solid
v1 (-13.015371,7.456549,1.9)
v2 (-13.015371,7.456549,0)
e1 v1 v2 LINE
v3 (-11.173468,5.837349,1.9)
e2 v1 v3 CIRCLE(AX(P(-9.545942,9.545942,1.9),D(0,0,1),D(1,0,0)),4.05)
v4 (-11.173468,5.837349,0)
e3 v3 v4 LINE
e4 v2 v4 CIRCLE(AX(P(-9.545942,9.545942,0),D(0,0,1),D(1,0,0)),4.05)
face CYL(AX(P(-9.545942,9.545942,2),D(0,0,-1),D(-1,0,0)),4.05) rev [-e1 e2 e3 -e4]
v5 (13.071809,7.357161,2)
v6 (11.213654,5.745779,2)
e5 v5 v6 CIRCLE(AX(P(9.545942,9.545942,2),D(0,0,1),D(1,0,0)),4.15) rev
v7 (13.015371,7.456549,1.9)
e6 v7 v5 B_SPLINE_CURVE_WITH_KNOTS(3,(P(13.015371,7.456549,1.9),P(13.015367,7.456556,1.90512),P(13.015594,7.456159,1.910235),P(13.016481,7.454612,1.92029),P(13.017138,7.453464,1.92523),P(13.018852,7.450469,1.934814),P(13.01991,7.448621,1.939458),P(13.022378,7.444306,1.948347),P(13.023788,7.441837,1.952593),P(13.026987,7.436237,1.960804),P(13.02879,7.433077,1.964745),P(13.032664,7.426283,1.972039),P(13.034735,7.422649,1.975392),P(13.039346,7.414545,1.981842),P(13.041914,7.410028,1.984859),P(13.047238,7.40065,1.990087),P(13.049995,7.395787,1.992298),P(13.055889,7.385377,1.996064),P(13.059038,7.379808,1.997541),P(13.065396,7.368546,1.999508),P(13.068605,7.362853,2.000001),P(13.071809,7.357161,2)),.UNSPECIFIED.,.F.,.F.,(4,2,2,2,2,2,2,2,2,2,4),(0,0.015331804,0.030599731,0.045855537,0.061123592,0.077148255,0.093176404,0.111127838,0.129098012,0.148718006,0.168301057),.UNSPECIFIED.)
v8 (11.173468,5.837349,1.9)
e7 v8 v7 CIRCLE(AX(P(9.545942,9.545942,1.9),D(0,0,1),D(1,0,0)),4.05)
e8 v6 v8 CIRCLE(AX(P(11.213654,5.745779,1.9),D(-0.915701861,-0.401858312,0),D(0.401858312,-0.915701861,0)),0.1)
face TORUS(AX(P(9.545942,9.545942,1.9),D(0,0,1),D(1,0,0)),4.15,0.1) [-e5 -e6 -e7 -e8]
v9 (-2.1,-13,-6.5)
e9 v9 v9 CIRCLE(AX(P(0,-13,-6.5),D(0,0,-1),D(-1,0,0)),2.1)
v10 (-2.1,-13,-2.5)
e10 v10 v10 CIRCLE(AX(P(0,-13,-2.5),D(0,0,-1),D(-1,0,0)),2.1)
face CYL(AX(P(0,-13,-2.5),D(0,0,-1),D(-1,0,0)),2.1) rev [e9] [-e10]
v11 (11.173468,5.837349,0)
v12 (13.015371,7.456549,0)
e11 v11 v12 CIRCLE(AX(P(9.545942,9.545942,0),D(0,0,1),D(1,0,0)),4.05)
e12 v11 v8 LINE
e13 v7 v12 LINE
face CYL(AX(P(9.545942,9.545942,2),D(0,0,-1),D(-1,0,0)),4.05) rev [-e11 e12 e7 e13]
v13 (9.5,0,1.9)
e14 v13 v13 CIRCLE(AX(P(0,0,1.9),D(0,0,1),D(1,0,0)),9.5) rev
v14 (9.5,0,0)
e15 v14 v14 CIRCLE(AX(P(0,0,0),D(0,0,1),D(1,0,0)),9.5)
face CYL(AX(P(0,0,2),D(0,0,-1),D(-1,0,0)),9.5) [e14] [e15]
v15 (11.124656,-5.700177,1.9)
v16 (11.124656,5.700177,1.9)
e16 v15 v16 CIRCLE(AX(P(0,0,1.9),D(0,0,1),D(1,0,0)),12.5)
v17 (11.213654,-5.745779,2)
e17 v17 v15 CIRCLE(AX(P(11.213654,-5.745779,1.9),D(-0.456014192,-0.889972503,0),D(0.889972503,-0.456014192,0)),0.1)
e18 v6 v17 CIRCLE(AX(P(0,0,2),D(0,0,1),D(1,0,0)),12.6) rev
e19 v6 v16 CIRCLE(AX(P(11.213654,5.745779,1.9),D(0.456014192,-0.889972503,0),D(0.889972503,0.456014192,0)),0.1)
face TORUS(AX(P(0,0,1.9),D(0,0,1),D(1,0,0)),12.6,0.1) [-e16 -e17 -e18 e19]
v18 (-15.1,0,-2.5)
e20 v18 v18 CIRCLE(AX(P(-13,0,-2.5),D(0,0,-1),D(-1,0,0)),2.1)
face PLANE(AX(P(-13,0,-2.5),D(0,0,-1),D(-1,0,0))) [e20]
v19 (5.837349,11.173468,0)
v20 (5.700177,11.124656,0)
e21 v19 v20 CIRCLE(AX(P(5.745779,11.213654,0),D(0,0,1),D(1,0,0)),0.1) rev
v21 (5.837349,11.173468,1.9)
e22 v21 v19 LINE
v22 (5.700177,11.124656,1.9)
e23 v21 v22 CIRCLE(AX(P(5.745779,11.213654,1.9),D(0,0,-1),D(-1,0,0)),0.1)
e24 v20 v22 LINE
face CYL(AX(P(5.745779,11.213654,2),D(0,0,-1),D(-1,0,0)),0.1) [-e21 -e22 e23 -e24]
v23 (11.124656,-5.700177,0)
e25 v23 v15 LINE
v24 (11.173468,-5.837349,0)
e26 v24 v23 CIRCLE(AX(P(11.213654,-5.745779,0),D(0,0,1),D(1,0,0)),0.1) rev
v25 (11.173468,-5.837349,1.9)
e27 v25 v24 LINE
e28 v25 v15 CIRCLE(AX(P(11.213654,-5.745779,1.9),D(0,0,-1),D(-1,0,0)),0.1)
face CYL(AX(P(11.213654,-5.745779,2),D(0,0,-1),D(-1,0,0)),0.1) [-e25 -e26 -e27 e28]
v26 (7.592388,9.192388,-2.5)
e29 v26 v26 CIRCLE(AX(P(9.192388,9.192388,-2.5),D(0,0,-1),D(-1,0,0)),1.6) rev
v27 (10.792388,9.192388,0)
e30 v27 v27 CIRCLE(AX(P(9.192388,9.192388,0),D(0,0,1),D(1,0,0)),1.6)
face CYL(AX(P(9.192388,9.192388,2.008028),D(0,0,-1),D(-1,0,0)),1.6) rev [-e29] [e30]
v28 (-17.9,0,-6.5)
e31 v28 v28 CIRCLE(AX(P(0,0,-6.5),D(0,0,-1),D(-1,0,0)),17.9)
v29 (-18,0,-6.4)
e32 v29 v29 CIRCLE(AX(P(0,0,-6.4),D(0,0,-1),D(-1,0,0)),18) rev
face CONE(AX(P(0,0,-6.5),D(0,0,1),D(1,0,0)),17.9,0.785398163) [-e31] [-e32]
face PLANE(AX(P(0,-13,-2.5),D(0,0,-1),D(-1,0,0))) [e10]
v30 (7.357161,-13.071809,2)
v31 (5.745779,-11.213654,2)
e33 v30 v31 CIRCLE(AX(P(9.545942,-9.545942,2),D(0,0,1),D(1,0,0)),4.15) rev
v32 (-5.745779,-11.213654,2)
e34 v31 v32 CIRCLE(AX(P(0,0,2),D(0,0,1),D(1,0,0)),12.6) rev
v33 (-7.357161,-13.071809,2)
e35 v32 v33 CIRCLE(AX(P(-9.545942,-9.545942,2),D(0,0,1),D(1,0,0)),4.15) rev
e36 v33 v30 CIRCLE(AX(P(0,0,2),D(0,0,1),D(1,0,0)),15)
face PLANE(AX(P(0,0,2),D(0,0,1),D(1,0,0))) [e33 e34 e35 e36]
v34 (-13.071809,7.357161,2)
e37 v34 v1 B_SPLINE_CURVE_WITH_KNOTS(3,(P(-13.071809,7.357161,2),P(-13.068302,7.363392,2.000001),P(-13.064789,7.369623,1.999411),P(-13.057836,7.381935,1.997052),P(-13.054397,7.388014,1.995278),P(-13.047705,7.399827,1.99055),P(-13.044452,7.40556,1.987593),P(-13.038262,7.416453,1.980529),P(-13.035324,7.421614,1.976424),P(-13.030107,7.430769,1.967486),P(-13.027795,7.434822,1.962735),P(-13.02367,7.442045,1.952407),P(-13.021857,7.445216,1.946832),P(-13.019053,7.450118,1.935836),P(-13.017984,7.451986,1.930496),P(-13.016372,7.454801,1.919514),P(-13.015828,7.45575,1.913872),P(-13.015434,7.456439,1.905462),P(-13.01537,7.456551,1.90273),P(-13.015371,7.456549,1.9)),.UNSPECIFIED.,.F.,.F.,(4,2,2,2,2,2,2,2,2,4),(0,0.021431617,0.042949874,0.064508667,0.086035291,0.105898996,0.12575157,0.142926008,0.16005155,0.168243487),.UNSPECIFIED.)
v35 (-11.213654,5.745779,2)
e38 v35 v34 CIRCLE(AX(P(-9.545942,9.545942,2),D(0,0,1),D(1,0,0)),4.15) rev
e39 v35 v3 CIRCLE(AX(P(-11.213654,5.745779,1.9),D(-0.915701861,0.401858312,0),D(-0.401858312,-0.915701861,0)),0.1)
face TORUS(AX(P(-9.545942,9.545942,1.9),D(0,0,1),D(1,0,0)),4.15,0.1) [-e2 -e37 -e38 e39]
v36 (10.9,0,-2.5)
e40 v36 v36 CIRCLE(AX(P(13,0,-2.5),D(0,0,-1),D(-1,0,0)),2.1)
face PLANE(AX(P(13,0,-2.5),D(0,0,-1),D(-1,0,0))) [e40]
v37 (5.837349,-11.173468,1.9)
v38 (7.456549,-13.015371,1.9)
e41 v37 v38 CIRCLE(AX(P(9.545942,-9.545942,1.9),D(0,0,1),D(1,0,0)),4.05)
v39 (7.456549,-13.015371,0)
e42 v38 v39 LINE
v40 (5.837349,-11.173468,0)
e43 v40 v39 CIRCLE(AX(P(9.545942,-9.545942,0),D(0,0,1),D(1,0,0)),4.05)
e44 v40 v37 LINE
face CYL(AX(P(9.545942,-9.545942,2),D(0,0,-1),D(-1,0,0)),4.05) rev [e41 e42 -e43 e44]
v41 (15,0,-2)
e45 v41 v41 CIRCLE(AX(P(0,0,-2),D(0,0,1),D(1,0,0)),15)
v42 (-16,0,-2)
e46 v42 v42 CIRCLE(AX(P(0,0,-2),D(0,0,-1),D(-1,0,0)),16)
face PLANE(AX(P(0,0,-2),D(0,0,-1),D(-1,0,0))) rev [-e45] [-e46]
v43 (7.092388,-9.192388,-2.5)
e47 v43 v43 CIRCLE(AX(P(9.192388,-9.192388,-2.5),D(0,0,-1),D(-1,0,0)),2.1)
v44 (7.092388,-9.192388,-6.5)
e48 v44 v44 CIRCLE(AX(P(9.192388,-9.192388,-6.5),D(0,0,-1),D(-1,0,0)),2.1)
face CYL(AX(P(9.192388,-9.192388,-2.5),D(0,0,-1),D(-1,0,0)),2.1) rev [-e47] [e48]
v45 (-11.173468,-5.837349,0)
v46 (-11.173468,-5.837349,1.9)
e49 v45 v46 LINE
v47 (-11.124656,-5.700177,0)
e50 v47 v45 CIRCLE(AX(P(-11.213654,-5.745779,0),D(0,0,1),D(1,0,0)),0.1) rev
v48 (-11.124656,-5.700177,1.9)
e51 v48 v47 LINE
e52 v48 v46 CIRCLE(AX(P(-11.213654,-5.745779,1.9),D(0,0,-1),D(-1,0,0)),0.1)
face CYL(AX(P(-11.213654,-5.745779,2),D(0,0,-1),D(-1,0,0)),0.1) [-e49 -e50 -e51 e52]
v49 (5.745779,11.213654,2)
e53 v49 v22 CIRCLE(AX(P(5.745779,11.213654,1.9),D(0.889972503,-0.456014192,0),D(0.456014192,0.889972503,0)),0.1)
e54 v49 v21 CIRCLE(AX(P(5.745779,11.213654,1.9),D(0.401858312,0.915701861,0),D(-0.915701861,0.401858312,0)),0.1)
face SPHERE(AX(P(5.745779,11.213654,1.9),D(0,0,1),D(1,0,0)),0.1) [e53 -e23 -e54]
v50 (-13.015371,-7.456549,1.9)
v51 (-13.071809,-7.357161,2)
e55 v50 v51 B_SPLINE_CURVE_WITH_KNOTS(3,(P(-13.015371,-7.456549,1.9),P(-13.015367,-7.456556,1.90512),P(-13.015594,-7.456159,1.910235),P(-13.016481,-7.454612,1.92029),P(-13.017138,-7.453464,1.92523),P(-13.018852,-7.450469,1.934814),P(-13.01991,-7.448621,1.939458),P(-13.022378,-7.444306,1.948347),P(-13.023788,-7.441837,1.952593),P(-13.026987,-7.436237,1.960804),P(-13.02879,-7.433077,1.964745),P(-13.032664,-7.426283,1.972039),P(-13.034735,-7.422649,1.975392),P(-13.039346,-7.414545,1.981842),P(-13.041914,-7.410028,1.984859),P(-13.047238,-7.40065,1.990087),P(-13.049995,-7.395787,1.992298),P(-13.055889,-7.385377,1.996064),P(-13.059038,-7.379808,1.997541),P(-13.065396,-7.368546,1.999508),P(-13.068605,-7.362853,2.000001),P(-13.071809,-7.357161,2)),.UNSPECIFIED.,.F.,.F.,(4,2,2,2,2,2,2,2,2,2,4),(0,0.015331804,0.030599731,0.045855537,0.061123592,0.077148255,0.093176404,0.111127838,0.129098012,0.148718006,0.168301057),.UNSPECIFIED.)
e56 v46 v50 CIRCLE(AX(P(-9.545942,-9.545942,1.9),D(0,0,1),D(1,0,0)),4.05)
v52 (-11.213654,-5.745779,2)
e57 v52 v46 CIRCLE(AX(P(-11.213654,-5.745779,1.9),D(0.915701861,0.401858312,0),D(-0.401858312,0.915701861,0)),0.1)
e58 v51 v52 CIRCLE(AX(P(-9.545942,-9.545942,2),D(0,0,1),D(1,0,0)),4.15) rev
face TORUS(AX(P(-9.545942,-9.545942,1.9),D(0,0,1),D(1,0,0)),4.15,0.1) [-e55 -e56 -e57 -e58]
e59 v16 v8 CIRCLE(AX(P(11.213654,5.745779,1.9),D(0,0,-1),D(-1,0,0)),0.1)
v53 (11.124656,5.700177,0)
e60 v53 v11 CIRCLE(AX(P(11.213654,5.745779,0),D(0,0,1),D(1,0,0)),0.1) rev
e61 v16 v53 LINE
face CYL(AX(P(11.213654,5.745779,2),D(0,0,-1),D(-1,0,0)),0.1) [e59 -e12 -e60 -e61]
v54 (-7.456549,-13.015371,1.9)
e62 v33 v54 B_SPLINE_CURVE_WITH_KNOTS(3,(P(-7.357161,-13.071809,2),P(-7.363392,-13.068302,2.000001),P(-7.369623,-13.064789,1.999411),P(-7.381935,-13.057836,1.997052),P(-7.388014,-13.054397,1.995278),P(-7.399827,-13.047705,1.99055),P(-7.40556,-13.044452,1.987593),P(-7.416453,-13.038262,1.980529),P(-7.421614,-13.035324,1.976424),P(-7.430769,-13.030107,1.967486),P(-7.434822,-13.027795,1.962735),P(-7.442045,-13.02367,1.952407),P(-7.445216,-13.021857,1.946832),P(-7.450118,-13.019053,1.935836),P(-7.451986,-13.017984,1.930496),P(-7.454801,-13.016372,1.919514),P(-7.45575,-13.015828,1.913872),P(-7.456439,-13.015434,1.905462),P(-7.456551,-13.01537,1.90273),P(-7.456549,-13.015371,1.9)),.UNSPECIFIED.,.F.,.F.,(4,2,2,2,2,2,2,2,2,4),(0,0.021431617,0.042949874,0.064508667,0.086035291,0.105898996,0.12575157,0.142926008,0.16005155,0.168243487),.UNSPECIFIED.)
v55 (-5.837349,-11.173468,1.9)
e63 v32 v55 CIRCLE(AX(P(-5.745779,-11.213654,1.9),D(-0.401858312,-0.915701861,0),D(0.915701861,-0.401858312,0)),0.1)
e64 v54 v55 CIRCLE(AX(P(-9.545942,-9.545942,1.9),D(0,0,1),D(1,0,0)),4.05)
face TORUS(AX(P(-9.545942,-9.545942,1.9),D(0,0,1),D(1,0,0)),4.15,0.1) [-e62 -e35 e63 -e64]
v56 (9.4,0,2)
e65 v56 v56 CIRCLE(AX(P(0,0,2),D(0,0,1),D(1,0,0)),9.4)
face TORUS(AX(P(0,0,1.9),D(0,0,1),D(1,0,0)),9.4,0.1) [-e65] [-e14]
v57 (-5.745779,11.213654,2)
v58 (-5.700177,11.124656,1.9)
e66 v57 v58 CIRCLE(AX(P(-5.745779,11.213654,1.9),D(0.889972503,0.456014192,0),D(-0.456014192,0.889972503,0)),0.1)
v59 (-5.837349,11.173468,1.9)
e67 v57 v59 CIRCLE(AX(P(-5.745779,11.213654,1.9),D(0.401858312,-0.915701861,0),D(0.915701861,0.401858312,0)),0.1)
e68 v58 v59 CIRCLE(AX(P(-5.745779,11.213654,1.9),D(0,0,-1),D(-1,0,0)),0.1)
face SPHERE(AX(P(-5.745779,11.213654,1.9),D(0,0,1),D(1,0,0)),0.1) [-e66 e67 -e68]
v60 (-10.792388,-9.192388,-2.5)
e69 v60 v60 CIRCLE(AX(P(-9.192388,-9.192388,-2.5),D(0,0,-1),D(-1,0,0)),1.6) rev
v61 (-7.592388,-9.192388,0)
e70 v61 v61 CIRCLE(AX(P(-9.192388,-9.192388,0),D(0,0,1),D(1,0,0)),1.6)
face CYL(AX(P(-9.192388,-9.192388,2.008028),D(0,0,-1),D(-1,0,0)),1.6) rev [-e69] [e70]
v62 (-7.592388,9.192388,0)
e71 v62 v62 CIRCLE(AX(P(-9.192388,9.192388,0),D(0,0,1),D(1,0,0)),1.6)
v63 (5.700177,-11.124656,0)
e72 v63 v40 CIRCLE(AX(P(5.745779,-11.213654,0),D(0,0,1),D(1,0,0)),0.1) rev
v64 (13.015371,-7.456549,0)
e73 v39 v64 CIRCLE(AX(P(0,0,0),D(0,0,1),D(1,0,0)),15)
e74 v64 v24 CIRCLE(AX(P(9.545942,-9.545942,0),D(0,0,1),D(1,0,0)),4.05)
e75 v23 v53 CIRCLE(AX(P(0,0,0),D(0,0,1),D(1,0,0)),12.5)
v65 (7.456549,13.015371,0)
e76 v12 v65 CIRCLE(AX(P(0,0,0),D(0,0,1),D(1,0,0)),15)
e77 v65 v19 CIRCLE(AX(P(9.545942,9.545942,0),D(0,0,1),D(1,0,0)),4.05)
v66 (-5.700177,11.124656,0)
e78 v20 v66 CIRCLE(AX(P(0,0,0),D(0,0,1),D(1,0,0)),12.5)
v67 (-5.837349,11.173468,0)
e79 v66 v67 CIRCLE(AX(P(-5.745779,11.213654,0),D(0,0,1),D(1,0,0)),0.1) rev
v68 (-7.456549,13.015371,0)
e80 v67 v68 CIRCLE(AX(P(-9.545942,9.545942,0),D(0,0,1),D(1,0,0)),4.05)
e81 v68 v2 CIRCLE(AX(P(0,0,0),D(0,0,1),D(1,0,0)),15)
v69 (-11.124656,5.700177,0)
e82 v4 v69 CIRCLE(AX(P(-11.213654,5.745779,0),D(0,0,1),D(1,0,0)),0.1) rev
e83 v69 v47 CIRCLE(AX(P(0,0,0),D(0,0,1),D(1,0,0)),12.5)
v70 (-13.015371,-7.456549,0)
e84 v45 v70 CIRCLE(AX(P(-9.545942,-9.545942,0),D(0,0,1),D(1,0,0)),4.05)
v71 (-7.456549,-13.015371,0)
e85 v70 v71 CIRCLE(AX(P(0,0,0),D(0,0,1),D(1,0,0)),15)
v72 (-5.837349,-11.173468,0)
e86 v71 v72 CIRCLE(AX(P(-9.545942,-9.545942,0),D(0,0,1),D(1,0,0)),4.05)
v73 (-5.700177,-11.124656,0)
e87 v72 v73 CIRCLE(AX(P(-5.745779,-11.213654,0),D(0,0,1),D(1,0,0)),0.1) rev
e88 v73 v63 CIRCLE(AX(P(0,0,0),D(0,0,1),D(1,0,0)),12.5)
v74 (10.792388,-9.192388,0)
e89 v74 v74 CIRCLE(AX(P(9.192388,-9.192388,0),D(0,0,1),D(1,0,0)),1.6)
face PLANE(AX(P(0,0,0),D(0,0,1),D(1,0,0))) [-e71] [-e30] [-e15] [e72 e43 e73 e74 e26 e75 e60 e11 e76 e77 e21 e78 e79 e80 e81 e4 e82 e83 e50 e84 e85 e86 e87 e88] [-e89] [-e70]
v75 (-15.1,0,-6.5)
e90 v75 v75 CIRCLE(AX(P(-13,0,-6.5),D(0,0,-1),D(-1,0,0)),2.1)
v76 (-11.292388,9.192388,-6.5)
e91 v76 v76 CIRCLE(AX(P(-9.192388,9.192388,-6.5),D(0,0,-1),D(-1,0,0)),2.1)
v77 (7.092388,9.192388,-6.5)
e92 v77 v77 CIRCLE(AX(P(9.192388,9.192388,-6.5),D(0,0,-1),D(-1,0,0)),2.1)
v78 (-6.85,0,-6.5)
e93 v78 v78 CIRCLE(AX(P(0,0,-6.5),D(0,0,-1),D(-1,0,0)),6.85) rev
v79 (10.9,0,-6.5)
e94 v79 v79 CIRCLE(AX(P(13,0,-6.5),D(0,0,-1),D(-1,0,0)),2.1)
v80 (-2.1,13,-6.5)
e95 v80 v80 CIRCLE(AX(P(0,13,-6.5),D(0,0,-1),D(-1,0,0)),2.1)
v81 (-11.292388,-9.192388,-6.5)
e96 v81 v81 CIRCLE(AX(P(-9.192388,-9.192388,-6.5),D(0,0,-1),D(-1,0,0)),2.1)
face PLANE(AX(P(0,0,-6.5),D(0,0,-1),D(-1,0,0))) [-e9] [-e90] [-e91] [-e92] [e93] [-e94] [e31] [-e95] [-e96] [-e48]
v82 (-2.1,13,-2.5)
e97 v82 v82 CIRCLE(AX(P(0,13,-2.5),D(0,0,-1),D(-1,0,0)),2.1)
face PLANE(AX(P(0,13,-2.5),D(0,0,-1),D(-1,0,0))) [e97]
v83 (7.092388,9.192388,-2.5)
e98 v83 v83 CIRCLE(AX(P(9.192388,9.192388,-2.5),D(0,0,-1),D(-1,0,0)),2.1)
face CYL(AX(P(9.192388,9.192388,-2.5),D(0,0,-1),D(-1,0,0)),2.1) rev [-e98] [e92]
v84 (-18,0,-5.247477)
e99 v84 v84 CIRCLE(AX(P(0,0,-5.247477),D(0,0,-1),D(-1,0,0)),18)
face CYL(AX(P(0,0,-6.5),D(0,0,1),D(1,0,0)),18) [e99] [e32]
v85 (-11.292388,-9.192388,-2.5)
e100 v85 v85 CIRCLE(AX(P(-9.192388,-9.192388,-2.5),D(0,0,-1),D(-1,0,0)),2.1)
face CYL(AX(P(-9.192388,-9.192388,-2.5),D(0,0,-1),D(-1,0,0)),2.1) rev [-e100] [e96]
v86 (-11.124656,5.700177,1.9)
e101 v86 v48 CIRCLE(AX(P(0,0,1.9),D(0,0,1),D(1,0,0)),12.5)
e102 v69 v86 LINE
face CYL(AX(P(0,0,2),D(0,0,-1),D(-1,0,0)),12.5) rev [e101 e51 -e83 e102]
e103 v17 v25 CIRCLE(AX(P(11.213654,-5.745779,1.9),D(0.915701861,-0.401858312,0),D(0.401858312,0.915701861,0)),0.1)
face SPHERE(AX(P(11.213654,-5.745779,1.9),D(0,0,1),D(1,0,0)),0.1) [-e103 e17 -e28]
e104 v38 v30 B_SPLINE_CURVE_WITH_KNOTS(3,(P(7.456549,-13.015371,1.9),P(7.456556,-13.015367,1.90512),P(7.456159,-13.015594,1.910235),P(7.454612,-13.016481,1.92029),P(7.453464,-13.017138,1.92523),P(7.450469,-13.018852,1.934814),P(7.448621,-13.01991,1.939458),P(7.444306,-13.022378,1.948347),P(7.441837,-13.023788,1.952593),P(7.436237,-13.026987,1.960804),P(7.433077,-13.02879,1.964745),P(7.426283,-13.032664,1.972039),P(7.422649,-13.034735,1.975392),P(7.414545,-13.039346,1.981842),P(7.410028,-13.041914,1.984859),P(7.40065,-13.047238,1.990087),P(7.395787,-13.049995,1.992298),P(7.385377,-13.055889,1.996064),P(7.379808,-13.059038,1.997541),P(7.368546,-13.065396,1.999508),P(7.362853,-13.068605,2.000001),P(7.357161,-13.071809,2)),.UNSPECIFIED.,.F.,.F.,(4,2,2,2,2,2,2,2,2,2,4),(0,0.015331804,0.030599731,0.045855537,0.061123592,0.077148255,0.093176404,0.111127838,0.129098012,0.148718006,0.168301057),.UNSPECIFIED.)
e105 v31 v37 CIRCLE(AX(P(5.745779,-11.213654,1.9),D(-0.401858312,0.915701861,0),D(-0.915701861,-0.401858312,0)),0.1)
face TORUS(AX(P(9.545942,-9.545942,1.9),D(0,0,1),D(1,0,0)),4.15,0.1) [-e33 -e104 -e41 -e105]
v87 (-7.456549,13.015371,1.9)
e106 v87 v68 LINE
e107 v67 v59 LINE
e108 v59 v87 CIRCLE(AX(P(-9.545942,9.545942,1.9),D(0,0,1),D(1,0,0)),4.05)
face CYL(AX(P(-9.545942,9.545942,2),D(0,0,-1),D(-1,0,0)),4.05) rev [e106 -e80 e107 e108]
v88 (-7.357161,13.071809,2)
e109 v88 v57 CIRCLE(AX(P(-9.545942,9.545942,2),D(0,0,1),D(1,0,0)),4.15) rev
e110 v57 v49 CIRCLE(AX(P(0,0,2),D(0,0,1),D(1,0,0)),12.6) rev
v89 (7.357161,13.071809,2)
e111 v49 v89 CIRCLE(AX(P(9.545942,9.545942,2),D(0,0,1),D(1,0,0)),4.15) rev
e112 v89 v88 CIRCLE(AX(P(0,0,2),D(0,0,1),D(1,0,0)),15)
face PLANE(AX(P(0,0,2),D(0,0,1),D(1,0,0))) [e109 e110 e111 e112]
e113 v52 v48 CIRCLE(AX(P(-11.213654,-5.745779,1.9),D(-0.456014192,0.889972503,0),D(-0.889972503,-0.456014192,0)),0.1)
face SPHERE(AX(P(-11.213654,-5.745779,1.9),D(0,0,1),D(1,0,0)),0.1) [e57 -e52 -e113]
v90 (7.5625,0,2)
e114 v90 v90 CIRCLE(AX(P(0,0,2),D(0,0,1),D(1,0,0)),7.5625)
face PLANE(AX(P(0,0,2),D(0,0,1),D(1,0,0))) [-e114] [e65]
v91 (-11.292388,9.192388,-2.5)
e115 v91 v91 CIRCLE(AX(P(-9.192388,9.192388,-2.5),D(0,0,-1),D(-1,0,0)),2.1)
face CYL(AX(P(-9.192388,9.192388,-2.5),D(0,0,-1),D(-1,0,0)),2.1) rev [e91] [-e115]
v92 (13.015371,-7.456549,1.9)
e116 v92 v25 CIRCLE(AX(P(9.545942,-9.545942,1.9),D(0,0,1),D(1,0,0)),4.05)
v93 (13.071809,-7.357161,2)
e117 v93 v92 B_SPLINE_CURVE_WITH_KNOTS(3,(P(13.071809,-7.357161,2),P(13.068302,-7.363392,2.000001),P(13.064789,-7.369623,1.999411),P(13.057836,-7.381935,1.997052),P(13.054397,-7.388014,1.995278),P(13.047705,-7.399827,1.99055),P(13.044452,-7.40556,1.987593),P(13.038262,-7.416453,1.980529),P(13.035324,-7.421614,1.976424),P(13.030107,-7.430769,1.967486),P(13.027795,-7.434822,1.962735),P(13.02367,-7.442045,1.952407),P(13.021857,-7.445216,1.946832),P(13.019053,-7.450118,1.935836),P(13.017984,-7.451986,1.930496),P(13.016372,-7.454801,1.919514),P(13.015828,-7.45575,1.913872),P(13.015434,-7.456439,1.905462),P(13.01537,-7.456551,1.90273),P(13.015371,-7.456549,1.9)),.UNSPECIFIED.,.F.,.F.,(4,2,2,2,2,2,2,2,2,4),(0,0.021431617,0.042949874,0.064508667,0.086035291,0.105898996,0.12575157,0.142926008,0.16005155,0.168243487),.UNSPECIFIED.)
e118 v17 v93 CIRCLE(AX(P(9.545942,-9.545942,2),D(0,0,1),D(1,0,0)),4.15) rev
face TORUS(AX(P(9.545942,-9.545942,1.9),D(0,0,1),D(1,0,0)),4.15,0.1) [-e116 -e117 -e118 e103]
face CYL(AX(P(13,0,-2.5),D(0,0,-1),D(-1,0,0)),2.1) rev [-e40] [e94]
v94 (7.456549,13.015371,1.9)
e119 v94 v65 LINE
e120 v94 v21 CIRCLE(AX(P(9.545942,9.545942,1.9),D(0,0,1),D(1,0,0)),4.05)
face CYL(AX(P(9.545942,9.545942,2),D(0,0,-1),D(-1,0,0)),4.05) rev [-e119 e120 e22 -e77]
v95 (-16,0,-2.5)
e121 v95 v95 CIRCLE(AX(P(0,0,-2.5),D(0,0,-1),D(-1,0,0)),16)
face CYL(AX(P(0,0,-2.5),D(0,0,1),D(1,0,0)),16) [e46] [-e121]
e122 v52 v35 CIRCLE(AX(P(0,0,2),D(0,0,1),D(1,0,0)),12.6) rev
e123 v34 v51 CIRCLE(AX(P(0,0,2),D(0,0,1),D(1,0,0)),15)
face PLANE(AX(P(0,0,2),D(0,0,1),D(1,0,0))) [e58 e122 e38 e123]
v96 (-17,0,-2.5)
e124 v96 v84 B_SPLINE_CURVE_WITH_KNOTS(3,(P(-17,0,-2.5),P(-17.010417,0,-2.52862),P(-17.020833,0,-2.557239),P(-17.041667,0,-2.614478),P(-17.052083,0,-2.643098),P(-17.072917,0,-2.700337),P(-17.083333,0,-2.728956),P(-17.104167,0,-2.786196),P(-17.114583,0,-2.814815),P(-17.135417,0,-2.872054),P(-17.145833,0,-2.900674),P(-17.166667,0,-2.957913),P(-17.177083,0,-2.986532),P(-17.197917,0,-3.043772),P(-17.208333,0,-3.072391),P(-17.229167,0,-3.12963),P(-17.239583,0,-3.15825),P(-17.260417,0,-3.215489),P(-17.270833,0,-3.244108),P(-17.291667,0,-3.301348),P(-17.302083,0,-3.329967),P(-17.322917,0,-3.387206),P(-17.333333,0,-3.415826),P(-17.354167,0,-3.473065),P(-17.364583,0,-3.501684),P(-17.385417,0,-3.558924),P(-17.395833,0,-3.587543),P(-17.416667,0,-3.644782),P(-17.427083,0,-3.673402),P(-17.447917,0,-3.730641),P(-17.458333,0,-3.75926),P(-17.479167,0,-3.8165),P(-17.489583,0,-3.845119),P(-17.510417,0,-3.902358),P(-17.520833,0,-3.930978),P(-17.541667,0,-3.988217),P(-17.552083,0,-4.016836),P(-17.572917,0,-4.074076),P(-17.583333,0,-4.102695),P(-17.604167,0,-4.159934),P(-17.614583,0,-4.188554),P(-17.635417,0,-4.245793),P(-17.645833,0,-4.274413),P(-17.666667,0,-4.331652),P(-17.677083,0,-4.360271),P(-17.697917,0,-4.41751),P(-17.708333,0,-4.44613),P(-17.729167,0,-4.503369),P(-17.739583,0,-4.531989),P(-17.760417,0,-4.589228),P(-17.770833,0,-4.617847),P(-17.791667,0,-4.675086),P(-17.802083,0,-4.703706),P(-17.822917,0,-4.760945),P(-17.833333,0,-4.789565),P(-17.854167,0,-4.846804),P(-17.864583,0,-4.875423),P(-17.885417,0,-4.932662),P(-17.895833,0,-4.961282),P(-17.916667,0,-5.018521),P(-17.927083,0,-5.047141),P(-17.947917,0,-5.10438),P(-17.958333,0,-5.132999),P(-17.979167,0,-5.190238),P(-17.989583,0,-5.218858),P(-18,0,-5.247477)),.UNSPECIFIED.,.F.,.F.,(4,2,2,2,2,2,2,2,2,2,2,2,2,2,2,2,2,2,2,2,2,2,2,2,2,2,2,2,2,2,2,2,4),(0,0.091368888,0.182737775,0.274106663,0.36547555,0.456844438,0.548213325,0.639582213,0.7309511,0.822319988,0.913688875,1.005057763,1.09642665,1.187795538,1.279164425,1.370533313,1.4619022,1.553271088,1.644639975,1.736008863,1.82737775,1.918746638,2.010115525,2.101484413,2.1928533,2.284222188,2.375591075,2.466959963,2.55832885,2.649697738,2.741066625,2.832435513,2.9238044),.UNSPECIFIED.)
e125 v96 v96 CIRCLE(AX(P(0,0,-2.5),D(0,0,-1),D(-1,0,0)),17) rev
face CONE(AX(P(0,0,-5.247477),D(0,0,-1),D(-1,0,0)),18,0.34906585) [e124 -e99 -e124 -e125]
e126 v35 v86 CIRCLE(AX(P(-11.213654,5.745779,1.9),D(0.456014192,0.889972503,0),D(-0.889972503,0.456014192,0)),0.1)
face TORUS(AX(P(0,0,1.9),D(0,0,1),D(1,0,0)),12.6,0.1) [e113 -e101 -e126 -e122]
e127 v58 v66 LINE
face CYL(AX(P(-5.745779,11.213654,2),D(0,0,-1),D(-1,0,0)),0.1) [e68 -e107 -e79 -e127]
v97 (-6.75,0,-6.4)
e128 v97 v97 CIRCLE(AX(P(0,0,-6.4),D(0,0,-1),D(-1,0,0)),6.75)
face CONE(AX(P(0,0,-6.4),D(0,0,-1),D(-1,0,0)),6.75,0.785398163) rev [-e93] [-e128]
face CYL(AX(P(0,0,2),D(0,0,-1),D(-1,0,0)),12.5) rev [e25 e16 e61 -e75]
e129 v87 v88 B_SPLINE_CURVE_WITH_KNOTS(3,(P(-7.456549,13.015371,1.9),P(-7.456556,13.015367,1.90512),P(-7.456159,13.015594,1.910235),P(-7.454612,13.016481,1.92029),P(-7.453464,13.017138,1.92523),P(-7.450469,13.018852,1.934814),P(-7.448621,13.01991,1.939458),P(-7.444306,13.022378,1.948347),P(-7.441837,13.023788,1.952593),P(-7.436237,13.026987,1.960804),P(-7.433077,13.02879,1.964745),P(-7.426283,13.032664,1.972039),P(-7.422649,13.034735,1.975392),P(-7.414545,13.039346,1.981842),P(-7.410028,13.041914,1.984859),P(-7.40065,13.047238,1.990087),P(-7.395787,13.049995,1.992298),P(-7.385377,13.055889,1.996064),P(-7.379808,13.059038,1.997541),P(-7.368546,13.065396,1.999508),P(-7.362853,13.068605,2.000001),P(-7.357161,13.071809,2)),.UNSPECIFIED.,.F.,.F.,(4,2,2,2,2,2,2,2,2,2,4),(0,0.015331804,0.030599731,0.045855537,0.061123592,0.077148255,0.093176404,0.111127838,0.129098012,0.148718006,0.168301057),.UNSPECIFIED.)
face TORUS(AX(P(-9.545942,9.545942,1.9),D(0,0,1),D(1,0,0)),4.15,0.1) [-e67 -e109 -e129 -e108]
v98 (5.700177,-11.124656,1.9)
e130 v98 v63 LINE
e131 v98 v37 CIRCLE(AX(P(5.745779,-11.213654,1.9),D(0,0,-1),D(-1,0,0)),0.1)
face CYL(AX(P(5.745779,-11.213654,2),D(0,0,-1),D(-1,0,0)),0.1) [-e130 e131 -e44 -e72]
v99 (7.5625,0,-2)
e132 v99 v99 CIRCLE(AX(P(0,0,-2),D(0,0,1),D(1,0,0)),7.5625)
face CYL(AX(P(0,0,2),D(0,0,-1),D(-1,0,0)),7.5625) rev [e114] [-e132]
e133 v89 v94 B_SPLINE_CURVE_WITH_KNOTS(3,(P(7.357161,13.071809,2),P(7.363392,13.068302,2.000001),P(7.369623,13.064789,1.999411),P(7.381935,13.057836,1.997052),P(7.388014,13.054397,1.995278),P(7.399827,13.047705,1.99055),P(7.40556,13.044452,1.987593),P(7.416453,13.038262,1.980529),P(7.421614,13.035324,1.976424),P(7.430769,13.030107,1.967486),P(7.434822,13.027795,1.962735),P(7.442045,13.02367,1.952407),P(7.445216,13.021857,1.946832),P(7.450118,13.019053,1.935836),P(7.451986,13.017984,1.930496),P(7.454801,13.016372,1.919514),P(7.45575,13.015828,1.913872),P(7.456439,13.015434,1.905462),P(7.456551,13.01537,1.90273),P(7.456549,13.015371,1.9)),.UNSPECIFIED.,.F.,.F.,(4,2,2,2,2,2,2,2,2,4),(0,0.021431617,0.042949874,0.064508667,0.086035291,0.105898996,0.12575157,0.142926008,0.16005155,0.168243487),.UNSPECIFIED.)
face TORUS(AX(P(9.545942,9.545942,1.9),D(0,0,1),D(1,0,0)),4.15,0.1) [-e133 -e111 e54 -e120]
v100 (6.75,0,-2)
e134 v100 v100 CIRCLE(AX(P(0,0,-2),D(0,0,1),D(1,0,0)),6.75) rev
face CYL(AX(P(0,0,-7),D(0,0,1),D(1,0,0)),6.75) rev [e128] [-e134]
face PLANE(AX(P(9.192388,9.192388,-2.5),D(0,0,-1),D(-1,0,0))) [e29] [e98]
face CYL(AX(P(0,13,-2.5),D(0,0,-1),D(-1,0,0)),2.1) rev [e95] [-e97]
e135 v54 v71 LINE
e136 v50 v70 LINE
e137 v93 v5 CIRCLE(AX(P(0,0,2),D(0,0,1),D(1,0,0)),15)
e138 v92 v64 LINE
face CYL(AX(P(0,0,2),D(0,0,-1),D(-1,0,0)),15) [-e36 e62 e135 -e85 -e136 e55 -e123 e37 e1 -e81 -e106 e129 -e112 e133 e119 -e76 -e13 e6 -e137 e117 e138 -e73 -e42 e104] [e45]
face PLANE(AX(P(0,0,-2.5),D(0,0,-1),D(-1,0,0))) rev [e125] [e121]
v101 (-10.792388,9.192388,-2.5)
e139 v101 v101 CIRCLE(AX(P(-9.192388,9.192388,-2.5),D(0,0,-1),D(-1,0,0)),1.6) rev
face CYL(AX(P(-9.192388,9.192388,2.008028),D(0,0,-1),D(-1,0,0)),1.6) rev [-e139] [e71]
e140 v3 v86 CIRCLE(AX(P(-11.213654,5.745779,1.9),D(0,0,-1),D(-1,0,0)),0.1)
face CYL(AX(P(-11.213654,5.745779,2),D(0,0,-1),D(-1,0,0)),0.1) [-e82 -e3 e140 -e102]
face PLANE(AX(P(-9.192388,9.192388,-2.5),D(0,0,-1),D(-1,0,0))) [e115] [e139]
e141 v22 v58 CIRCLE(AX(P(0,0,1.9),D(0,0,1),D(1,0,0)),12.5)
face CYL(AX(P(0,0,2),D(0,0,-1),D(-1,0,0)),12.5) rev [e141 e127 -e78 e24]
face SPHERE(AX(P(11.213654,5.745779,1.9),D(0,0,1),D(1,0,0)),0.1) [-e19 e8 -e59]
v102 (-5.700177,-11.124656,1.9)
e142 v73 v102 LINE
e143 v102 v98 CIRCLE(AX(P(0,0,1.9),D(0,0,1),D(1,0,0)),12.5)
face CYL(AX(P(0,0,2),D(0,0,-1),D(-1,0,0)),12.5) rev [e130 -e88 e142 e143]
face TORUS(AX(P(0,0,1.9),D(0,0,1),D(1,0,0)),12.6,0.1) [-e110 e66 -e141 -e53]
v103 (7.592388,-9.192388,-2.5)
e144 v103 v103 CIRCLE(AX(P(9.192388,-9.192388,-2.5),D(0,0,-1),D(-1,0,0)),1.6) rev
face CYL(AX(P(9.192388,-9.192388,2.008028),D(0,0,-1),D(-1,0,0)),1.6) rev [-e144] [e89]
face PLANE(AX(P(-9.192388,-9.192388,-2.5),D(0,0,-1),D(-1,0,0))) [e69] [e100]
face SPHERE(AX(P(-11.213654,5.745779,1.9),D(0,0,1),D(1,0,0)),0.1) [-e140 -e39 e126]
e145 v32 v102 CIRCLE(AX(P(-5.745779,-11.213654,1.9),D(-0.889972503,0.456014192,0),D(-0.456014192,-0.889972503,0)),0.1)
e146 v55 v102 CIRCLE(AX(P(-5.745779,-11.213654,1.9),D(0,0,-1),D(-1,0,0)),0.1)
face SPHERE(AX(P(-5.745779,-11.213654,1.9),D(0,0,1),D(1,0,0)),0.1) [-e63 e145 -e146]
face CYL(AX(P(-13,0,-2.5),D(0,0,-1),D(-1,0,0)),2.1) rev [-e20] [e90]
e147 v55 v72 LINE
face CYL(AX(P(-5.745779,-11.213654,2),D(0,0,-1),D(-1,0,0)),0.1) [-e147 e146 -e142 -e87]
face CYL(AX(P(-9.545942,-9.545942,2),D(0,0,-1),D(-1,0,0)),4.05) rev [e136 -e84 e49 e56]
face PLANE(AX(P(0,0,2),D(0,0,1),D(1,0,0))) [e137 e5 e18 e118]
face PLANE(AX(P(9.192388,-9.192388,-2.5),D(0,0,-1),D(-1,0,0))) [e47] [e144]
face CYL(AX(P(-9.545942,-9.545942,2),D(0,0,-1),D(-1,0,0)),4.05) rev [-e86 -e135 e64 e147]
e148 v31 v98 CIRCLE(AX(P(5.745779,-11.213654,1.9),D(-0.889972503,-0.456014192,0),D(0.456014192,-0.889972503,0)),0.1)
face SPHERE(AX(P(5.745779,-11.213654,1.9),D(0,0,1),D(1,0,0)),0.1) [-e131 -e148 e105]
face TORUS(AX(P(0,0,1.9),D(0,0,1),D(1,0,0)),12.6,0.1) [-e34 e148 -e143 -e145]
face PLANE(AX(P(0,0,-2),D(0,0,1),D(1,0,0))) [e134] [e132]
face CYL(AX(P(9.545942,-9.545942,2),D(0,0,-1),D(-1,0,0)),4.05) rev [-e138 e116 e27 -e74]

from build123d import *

# Parameters (mm, degrees)
BOSS_EXTRUDE1_DEPTH     = 2
BOSS_EXTRUDE1_2_DEPTH   = 2
BOSS_EXTRUDE1_3_DEPTH   = 2
BOSS_EXTRUDE1_4_DEPTH   = 2
SKETCH1_R               = 9.5
SKETCH1_R_2             = 7.5625
BOSS_EXTRUDE1_5_DEPTH   = 2
BOSS_EXTRUDE2_START     = -2
SKETCH2_R               = 15
BOSS_EXTRUDE2_DEPTH     = 2
FILLET1_R               = 0.1
FILLET2_R               = 0.1
SKETCH4_R               = 16
BOSS_EXTRUDE3_DEPTH     = 0.5
SKETCH5_R               = 18
BOSS_EXTRUDE4_DEPTH     = 4
CUT_EXTRUDE2_DEPTH      = 26.850531909
CUT_EXTRUDE2_DEPTH_BACK = 26.850531909
SKETCH3_R               = 1.6
SKETCH6_R               = 2.1
CUT_EXTRUDE3_DEPTH      = 4
SKETCH7_R               = 2.1
CUT_EXTRUDE4_DEPTH      = 4
SKETCH8_R               = 6.75
MIDDLE_CUTOUT_DEPTH     = 7
CHAMFER1_SIZE           = 0.1
CUT_EXTRUDE6_START      = -2
SKETCH9_R               = 7.5625
CUT_EXTRUDE6_DEPTH      = 2
CHAMFER2_SIZE           = 1
CHAMFER2_SIZE2          = 2.747477419


with BuildPart() as part:
    # Sketch1 → Boss-Extrude1 (new body)
    with BuildSketch(Plane.XY):
        with BuildLine():
            ThreePointArc((5.795745748, 11.075167323), (6.469207051, 12.179609111), (7.456549067, 13.01537076))
            ThreePointArc((7.456549067, 13.01537076), (0, 15), (-7.456549067, 13.01537076))
            ThreePointArc((-7.456549067, 13.01537076), (-6.469207051, 12.179609111), (-5.795745748, 11.075167323))
            ThreePointArc((-5.795745748, 11.075167323), (0, 12.5), (5.795745748, 11.075167323))
        make_face()
    extrude(amount=BOSS_EXTRUDE1_DEPTH)



with BuildPart() as body_2:
    # Sketch1 → Boss-Extrude1 2 (new body)
    with BuildSketch(Plane.XY):
        with BuildLine():
            ThreePointArc((13.01537076, -7.456549067), (14.495353762, -3.858071967), (15, 0))
            ThreePointArc((15, 0), (14.495353762, 3.858071967), (13.01537076, 7.456549067))
            ThreePointArc((13.01537076, 7.456549067), (12.179609111, 6.469207051), (11.075167323, 5.795745748))
            ThreePointArc((11.075167323, 5.795745748), (12.5, 0), (11.075167323, -5.795745748))
            ThreePointArc((11.075167323, -5.795745748), (12.179609111, -6.469207051), (13.01537076, -7.456549067))
        make_face()
    extrude(amount=BOSS_EXTRUDE1_2_DEPTH)


with BuildPart() as body_3:
    # Sketch1 → Boss-Extrude1 3 (new body)
    with BuildSketch(Plane.XY):
        with BuildLine():
            ThreePointArc((-7.456549067, -13.01537076), (0, -15), (7.456549067, -13.01537076))
            ThreePointArc((7.456549067, -13.01537076), (6.469207051, -12.179609111), (5.795745748, -11.075167323))
            ThreePointArc((5.795745748, -11.075167323), (0, -12.5), (-5.795745748, -11.075167323))
            ThreePointArc((-5.795745748, -11.075167323), (-6.469207051, -12.179609111), (-7.456549067, -13.01537076))
        make_face()
    extrude(amount=BOSS_EXTRUDE1_3_DEPTH)


with BuildPart() as body_4:
    # Sketch1 → Boss-Extrude1 4 (new body)
    with BuildSketch(Plane.XY):
        with BuildLine():
            ThreePointArc((-11.075167323, 5.795745748), (-12.179609111, 6.469207051), (-13.01537076, 7.456549067))
            ThreePointArc((-13.01537076, 7.456549067), (-15, 0), (-13.01537076, -7.456549067))
            ThreePointArc((-13.01537076, -7.456549067), (-12.179609111, -6.469207051), (-11.075167323, -5.795745748))
            ThreePointArc((-11.075167323, -5.795745748), (-12.5, 0), (-11.075167323, 5.795745748))
        make_face()
    extrude(amount=BOSS_EXTRUDE1_4_DEPTH)


with BuildPart() as body_5:
    # Sketch1 → Boss-Extrude1 5 (new body)
    with BuildSketch(Plane.XY):
        Circle(SKETCH1_R)
        Circle(SKETCH1_R_2, mode=Mode.SUBTRACT)
    extrude(amount=BOSS_EXTRUDE1_5_DEPTH)


with BuildPart() as part_1:
    add(part.part)

    add(body_2.part)  # Boss-Extrude2 merges body 2

    add(body_3.part)  # Boss-Extrude2 merges body 3

    add(body_4.part)  # Boss-Extrude2 merges body 4

    add(body_5.part)  # Boss-Extrude2 merges body 5
    # Sketch2 → Boss-Extrude2 (add)
    with BuildSketch(Plane.XY.offset(BOSS_EXTRUDE2_START)):
        with Locations(Location((0, 0, 0), (0, 0, 150.191461703))):
            Circle(SKETCH2_R)
    extrude(amount=BOSS_EXTRUDE2_DEPTH)

    # Fillet1
    fillet1_edges = [part_1.edges().sort_by_distance(p)[0] for p in [
        (11.075167323, 5.795745748, 1),
        (11.075167323, -5.795745748, 1),
        (5.795745748, -11.075167323, 1),
        (-5.795745748, -11.075167323, 1),
        (-11.075167323, -5.795745748, 1),
        (-11.075167323, 5.795745748, 1),
        (5.795745748, 11.075167323, 1),
        (-5.795745748, 11.075167323, 1),
    ]]
    fillet(fillet1_edges, radius=FILLET1_R)

    # Fillet2
    fillet2_edges = [part_1.edges().sort_by_distance(p)[0] for p in [
        (6.504180663, 12.219925602, 2),
        (12.219925602, -6.504180663, 2),
        (-6.504180663, -12.219925602, 2),
        (-12.219925602, 6.504180663, 2),
        (-9.5, 0, 2),
        (0, -12.5, 2),
        (6.504180663, -12.219925602, 2),
        (5.779303749, -11.119440592, 2),
        (-5.779303749, -11.119440592, 2),
        (12.5, 0, 2),
        (12.219925602, 6.504180663, 2),
        (11.119440592, 5.779303749, 2),
        (11.119440592, -5.779303749, 2),
        (0, 12.5, 2),
        (-6.504180663, 12.219925602, 2),
        (-5.779303749, 11.119440592, 2),
        (5.779303749, 11.119440592, 2),
        (-12.5, 0, 2),
        (-12.219925602, -6.504180663, 2),
        (-11.119440592, -5.779303749, 2),
        (-11.119440592, 5.779303749, 2),
    ]]
    fillet(fillet2_edges, radius=FILLET2_R - 0.0001)  # a hair under: the kernel refuses the full size

    # Sketch4 → Boss-Extrude3 (add)
    with BuildSketch(Plane(origin=(0, 0, -2), x_dir=(-1, 0, 0), z_dir=(0, 0, -1))):
        Circle(SKETCH4_R)
    extrude(amount=BOSS_EXTRUDE3_DEPTH)

    # Sketch5 → Boss-Extrude4 (add)
    with BuildSketch(Plane(origin=(0, 0, -2.5), x_dir=(-1, 0, 0), z_dir=(0, 0, -1))):
        Circle(SKETCH5_R)
    extrude(amount=BOSS_EXTRUDE4_DEPTH)

    # Sketch3 → Cut-Extrude2 (cut, two sides: drawn at the far end of the back side and taken through both)
    with BuildSketch(Plane(origin=(0, 0, -2), x_dir=(-1, 0, 0), z_dir=(0, 0, -1)).offset(-CUT_EXTRUDE2_DEPTH_BACK)):
        with Locations((-9.192388155, 9.192388155)):
            Circle(SKETCH3_R)
        with Locations((9.192388155, 9.192388155)):
            Circle(SKETCH3_R)
        with Locations((9.192388155, -9.192388155)):
            Circle(SKETCH3_R)
        with Locations((-9.192388155, -9.192388155)):
            Circle(SKETCH3_R)
    extrude(amount=CUT_EXTRUDE2_DEPTH + CUT_EXTRUDE2_DEPTH_BACK, mode=Mode.SUBTRACT)

    # Sketch6 → Cut-Extrude3 (cut)
    with BuildSketch(Plane(origin=(0, 0, -6.5), x_dir=(-1, 0, 0), z_dir=(0, 0, -1))):
        with Locations((-9.192388155, 9.192388155)):
            Circle(SKETCH6_R)
        with Locations((9.192388155, 9.192388155)):
            Circle(SKETCH6_R)
        with Locations((9.192388155, -9.192388155)):
            Circle(SKETCH6_R)
        with Locations((-9.192388155, -9.192388155)):
            Circle(SKETCH6_R)
    extrude(amount=-CUT_EXTRUDE3_DEPTH, mode=Mode.SUBTRACT)

    # Sketch7 → Cut-Extrude4 (cut)
    with BuildSketch(Plane(origin=(0, 0, -6.5), x_dir=(-1, 0, 0), z_dir=(0, 0, -1))):
        with Locations((0, 13)):
            Circle(SKETCH7_R)
        with Locations((13, 0)):
            Circle(SKETCH7_R)
        with Locations((0, -13)):
            Circle(SKETCH7_R)
        with Locations((-13, 0)):
            Circle(SKETCH7_R)
    extrude(amount=-CUT_EXTRUDE4_DEPTH, mode=Mode.SUBTRACT)

    # Sketch8 → Middle Cutout (cut)
    with BuildSketch(Plane.XY):
        Circle(SKETCH8_R)
    extrude(amount=-MIDDLE_CUTOUT_DEPTH, mode=Mode.SUBTRACT)

    # Chamfer1
    chamfer1_edges = [part_1.edges().sort_by_distance(p)[0] for p in [
        (18, 0, -6.5),
        (-6.75, 0, -6.5),
    ]]
    chamfer(chamfer1_edges, length=CHAMFER1_SIZE)

    # Sketch9 → Cut-Extrude6 (cut)
    with BuildSketch(Plane.XY.offset(CUT_EXTRUDE6_START)):
        Circle(SKETCH9_R)
    extrude(amount=CUT_EXTRUDE6_DEPTH, mode=Mode.SUBTRACT)

    # Chamfer2
    chamfer2_edges = [part_1.edges().sort_by_distance(p)[0] for p in [
        (18, 0, -2.5),
    ]]
    chamfer2_side = [part_1.faces().sort_by_distance(p)[0] for p in [
        (17.490883118, 0, -2.5),
    ]]
    chamfer(chamfer2_edges, length=CHAMFER2_SIZE, length2=CHAMFER2_SIZE2, reference=chamfer2_side[0])


solid = part_1.part
